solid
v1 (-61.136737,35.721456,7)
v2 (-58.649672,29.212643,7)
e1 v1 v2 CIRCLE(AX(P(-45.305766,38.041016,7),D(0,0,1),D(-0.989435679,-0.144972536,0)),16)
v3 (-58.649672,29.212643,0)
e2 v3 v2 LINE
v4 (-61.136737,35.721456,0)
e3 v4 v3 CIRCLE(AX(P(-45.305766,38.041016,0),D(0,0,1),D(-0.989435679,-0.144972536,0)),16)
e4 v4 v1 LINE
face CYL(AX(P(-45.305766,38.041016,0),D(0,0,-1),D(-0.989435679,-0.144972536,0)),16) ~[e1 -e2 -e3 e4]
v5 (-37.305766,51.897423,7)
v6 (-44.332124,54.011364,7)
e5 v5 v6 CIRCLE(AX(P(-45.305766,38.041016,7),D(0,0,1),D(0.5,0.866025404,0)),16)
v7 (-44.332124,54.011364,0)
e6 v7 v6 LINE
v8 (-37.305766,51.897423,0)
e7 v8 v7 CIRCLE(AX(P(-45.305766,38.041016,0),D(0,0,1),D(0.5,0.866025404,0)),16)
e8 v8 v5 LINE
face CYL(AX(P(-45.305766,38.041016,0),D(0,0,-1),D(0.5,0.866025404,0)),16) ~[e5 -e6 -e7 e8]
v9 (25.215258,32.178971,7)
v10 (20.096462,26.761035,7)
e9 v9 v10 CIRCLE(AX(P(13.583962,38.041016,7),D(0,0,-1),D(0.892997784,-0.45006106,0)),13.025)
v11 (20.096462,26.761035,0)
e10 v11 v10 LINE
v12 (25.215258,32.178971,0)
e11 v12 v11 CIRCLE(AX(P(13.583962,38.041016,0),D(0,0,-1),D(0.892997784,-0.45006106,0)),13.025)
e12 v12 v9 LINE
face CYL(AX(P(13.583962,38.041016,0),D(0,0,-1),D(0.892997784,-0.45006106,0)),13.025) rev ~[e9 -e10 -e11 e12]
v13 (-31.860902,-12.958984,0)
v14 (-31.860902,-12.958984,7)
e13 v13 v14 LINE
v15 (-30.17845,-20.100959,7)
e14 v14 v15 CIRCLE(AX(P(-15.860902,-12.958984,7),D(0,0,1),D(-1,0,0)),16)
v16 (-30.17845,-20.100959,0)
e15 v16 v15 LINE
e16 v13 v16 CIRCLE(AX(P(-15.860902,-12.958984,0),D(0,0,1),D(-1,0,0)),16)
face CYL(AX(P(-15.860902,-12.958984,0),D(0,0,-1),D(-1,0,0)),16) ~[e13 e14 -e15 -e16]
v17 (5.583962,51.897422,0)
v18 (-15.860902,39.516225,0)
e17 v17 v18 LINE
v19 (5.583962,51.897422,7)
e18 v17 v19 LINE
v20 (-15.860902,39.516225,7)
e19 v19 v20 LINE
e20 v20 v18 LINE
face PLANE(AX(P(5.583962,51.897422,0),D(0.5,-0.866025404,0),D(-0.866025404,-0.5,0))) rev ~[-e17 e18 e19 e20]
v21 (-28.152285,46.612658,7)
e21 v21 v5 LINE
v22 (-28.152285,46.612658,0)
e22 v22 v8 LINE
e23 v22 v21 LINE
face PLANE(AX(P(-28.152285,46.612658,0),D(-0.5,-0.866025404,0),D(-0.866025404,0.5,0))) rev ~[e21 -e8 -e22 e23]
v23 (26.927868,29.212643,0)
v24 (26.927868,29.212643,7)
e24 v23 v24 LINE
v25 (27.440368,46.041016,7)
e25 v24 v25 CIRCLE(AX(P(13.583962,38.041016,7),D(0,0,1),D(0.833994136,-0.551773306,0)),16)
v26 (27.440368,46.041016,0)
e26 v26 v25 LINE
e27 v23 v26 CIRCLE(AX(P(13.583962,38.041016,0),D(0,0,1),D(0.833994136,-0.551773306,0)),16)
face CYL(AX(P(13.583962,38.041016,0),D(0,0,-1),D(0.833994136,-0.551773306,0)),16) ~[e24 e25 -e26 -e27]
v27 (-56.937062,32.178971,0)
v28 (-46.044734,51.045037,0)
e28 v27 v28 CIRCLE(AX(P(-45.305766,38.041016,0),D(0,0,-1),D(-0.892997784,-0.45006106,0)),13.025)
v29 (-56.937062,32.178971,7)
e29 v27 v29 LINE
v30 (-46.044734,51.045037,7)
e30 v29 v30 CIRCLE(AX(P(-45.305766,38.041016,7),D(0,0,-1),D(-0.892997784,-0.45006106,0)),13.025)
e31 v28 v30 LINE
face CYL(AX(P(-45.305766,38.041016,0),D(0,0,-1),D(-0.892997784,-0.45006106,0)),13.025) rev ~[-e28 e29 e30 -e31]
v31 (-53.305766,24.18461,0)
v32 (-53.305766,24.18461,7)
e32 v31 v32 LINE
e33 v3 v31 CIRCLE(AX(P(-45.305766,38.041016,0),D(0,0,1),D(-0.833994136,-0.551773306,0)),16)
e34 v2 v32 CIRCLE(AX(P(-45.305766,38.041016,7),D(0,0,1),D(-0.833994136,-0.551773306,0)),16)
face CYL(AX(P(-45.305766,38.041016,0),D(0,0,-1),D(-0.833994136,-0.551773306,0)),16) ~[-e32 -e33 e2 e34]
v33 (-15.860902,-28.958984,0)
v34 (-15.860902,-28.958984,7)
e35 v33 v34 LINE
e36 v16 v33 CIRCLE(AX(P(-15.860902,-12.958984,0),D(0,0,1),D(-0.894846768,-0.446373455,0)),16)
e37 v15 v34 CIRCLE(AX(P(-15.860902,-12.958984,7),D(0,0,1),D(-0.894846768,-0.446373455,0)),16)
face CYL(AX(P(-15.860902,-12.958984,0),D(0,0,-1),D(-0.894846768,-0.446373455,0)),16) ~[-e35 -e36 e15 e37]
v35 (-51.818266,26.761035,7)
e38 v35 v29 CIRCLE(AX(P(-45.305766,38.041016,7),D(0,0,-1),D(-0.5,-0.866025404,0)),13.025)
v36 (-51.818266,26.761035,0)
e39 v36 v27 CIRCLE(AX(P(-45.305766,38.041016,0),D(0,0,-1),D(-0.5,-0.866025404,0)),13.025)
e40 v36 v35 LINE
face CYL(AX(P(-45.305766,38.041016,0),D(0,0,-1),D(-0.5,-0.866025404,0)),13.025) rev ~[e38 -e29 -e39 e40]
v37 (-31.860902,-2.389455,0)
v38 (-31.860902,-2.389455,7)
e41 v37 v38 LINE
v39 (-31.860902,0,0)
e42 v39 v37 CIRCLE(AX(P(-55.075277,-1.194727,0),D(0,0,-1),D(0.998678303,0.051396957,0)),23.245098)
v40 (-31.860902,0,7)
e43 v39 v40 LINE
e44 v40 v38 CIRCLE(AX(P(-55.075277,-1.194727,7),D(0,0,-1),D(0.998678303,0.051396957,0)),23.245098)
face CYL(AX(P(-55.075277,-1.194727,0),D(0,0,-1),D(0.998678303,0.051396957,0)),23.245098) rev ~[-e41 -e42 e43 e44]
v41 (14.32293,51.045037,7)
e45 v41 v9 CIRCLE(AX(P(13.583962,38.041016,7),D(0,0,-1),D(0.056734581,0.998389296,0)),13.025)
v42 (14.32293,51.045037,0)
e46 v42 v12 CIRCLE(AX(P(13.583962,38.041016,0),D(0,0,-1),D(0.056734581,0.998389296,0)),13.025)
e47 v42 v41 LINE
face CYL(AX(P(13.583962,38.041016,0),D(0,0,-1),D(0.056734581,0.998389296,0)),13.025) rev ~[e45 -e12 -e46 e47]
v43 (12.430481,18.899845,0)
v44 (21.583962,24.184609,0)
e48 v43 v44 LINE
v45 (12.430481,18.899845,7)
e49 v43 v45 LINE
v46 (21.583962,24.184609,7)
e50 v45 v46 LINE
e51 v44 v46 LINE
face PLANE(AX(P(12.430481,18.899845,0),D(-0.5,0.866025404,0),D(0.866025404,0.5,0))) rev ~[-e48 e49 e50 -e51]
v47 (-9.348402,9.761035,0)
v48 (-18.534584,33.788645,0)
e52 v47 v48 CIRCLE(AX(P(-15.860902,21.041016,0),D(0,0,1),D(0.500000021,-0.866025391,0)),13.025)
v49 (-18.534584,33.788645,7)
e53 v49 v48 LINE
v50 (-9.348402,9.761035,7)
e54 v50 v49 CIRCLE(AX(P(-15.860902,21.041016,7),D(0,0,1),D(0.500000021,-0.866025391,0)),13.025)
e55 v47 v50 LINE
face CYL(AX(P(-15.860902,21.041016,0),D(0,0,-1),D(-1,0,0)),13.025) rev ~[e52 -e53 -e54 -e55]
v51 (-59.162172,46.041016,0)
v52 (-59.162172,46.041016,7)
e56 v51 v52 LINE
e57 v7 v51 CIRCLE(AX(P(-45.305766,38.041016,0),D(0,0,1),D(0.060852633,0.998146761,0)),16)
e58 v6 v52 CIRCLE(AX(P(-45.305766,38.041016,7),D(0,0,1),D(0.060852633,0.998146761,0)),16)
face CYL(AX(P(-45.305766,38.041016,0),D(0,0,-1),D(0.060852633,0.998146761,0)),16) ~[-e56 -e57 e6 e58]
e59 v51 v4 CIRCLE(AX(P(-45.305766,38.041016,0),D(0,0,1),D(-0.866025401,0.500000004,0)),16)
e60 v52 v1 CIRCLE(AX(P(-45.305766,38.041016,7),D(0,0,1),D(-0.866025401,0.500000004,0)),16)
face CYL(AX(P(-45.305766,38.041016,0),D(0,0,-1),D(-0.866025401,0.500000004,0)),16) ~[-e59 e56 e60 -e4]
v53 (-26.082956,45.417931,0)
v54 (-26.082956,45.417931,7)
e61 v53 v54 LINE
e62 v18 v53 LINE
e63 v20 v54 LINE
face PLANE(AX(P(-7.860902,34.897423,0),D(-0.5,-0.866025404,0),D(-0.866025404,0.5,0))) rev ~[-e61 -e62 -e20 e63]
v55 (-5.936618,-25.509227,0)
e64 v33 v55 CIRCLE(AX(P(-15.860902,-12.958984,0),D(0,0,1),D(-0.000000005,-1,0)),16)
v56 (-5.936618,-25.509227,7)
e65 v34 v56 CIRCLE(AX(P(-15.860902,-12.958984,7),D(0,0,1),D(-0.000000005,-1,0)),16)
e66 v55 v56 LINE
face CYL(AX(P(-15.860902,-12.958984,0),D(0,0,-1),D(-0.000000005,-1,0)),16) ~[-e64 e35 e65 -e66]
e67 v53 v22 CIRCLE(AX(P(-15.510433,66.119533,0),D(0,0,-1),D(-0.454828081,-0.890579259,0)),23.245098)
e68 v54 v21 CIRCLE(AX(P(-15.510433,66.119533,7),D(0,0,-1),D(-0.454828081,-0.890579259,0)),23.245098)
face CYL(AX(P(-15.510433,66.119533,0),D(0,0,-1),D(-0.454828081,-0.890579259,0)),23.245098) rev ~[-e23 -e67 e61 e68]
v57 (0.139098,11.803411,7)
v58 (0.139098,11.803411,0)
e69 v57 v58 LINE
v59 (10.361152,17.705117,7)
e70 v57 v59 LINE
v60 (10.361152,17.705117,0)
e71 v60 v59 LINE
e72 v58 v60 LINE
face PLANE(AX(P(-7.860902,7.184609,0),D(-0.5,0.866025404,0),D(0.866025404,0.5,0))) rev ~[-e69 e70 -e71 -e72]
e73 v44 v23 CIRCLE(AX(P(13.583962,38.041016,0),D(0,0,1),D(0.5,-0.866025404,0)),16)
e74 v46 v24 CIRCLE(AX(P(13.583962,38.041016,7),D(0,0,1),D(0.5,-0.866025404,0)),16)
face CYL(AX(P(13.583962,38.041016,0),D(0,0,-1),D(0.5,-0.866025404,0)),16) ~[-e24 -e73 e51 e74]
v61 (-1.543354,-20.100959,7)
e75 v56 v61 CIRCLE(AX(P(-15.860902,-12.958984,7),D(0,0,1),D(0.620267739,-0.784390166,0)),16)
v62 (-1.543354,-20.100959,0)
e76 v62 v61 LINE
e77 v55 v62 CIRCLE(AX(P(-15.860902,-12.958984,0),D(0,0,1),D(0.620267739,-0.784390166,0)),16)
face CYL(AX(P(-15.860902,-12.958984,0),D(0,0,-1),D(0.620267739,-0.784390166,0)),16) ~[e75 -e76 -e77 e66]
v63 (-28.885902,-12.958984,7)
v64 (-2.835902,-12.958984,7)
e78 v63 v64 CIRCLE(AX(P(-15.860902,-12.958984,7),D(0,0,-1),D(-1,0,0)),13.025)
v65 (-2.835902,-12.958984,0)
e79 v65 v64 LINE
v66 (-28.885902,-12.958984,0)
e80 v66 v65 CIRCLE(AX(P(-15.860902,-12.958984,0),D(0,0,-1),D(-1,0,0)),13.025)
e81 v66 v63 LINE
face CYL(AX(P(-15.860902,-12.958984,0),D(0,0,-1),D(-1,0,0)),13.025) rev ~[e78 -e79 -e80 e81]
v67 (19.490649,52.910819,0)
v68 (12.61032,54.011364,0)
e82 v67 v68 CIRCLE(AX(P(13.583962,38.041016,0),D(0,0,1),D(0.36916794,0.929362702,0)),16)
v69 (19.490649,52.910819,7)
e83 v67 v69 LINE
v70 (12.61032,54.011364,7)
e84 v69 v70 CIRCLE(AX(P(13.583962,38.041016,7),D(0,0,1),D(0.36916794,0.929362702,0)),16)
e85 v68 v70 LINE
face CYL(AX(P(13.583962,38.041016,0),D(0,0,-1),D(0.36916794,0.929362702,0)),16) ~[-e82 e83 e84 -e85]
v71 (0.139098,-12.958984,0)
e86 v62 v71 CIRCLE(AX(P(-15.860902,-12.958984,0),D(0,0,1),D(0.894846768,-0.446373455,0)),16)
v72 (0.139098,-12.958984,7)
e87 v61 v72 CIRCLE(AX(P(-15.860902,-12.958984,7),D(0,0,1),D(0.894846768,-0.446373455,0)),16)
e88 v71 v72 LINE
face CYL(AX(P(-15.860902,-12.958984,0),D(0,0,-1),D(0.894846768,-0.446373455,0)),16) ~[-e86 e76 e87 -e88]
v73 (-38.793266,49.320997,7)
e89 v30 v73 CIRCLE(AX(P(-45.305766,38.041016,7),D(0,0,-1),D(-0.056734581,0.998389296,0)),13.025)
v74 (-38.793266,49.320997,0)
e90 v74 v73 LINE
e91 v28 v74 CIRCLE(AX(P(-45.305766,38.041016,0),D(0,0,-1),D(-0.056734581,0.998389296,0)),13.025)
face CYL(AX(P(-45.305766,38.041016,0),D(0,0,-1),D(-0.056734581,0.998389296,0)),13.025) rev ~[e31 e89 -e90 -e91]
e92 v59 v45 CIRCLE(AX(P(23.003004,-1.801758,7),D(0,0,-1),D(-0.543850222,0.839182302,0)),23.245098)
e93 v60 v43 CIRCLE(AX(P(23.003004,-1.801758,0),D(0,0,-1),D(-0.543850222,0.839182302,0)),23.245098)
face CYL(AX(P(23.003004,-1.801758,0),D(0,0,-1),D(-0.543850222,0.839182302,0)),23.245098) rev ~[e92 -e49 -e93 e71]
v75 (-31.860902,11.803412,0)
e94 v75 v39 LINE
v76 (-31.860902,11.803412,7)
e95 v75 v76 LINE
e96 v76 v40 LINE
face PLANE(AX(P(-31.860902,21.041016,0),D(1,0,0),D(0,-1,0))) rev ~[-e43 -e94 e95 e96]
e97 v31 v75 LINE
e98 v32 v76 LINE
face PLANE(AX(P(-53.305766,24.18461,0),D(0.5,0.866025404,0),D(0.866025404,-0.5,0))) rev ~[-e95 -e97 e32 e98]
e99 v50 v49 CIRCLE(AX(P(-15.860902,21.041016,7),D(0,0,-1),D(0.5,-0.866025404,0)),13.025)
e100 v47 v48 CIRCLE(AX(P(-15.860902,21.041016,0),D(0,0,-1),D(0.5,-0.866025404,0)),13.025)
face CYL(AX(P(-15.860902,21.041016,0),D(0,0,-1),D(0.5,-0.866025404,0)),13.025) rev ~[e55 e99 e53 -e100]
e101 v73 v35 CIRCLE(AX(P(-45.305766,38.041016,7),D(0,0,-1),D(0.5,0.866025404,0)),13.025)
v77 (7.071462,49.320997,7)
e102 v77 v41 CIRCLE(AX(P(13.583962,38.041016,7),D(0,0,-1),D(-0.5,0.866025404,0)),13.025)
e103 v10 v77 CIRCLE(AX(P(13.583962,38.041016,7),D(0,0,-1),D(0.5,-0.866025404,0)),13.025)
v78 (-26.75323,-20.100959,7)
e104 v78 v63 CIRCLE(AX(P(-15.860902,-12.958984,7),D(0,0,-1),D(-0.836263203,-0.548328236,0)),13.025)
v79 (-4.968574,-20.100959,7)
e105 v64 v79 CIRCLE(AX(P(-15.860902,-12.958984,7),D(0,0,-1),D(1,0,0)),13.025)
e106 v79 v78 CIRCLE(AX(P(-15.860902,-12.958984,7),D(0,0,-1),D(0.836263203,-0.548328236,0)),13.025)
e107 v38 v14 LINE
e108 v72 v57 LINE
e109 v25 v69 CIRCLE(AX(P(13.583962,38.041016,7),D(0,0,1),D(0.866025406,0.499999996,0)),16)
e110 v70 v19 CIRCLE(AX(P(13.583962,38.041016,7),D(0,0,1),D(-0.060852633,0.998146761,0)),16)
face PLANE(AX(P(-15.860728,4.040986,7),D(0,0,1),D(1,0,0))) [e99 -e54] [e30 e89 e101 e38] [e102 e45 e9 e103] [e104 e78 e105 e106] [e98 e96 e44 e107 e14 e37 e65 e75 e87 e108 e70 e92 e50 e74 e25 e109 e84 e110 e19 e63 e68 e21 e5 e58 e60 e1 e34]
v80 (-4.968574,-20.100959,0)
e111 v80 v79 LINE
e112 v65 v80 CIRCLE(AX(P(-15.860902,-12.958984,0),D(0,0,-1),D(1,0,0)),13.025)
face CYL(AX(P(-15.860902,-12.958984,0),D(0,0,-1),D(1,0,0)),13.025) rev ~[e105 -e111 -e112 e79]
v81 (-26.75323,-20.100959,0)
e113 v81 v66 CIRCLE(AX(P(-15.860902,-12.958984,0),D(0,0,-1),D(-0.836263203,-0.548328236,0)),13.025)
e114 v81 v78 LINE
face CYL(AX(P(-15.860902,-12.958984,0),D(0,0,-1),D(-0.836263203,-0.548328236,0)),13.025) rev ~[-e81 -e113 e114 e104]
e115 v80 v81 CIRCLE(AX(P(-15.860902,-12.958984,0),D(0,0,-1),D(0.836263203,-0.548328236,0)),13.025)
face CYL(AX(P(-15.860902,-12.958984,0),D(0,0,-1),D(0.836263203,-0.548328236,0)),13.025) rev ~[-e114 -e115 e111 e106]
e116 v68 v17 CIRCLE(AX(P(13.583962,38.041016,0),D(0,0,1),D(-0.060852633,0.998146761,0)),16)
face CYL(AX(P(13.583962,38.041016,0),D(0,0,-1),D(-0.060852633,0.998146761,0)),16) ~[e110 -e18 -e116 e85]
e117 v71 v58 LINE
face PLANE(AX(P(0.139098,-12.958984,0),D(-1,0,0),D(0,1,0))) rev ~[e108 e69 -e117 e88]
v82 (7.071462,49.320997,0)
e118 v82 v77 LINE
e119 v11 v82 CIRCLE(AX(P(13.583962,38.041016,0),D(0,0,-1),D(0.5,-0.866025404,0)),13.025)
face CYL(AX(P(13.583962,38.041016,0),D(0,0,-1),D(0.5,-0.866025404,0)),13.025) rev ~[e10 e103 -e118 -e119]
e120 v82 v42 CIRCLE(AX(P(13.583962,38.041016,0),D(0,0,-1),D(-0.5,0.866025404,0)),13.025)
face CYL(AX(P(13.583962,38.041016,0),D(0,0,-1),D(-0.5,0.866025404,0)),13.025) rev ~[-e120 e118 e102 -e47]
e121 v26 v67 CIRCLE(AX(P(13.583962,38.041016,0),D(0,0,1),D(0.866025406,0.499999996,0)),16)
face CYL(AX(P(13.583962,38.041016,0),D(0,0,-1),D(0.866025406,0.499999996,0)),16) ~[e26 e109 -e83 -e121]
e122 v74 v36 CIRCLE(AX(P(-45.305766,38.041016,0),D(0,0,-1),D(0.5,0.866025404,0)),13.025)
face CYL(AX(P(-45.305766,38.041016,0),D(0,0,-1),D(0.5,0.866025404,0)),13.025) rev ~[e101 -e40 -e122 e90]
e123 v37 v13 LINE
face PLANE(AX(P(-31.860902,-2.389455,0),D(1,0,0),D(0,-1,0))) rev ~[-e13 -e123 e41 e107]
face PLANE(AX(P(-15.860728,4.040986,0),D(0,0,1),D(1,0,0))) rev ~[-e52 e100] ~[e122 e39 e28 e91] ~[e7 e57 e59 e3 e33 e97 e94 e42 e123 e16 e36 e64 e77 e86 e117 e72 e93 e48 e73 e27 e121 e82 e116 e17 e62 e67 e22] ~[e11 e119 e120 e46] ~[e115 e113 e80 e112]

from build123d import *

# Parameters (mm, degrees)
F1_DEPTH        = 7
F1_COPIES_COUNT = 3


# Not quite as in the source:
# - a feature of the source that left no trace in its solid (it failed there, or was rolled back) is left out
# - a pattern or mirror of a feature is missing from the dataset's text; its kind, count and spacing are read off the source's solid


with BuildPart() as f1:
    # F0 (on Top) → F1 (new body)
    with BuildSketch(Plane.XY):
        with BuildLine():
            Line((0.1390978545, -12.9589841303), (0.1390978545, 21.0410158697))
            ThreePointArc((0.1390978545, 21.0410158697), (-15.8609021455, 5.0410158697), (-31.8609021455, 21.0410158697))
            Line((-31.8609021455, 21.0410158697), (-31.8609021455, 0))
            ThreePointArc((-31.8609021455, 0), (-31.8301791681, -1.1947273097), (-31.8609021455, -2.3894546193))
            Line((-31.8609021455, -2.3894546193), (-31.8609021455, -12.9589841303))
            ThreePointArc((-31.8609021455, -12.9589841303), (-15.8609021455, 3.0410158697), (0.1390978545, -12.9589841303))
        make_face()
        with BuildLine():
            Line((0.1390978545, 21.0410158697), (-2.8359021455, 21.0410158697))
            ThreePointArc((-2.8359021455, 21.0410158697), (-15.8609021455, 8.0160158697), (-28.8859021455, 21.0410158697))
            Line((-28.8859021455, 21.0410158697), (-31.8609021455, 21.0410158697))
            ThreePointArc((-31.8609021455, 21.0410158697), (-15.8609021455, 5.0410158697), (0.1390978545, 21.0410158697))
        make_face()
        with BuildLine():
            ThreePointArc((-28.8859021455, 21.0410158697), (-15.8609021455, 34.0660158697), (-2.8359021455, 21.0410158697))
            Line((-2.8359021455, 21.0410158697), (0.1390978545, 21.0410158697))
            ThreePointArc((0.1390978545, 21.0410158697), (-15.8609021455, 37.0410158697), (-31.8609021455, 21.0410158697))
            Line((-31.8609021455, 21.0410158697), (-28.8859021455, 21.0410158697))
        make_face()
        with BuildLine():
            Line((-2.8359021455, -12.9589841303), (0.1390978545, -12.9589841303))
            ThreePointArc((0.1390978545, -12.9589841303), (-15.8609021455, 3.0410158697), (-31.8609021455, -12.9589841303))
            Line((-31.8609021455, -12.9589841303), (-28.8859021455, -12.9589841303))
            ThreePointArc((-28.8859021455, -12.9589841303), (-15.8609021455, 0.0660158697), (-2.8359021455, -12.9589841303))
        make_face()
        with BuildLine():
            Line((-28.8859021455, -12.9589841303), (-31.8609021455, -12.9589841303))
            ThreePointArc((-31.8609021455, -12.9589841303), (-31.4346103213, -16.6277187425), (-30.1784504386, -20.1009594084))
            Line((-30.1784504386, -20.1009594084), (-26.7532303689, -20.1009594084))
            ThreePointArc((-26.7532303689, -20.1009594084), (-28.3413508576, -16.6857823466), (-28.8859021455, -12.9589841303))
        make_face()
        with BuildLine():
            ThreePointArc((-1.5433538524, -20.1009594084), (-0.2871939697, -16.6277187425), (0.1390978545, -12.9589841303))
            Line((0.1390978545, -12.9589841303), (-2.8359021455, -12.9589841303))
            ThreePointArc((-2.8359021455, -12.9589841303), (-3.3804534334, -16.6857823466), (-4.9685739221, -20.1009594084))
            Line((-4.9685739221, -20.1009594084), (-1.5433538524, -20.1009594084))
        make_face()
        with BuildLine():
            ThreePointArc((-5.9366183214, -25.5092267804), (-3.4420074647, -23.0471482302), (-1.5433538524, -20.1009594084))
            Line((-1.5433538524, -20.1009594084), (-4.9685739221, -20.1009594084))
            ThreePointArc((-4.9685739221, -20.1009594084), (-15.8609021455, -25.9839841303), (-26.7532303689, -20.1009594084))
            Line((-26.7532303689, -20.1009594084), (-30.1784504386, -20.1009594084))
            ThreePointArc((-30.1784504386, -20.1009594084), (-24.2789897171, -26.5654458906), (-15.8609022277, -28.9589841303))
            ThreePointArc((-15.8609022277, -28.9589841303), (-10.6075167236, -28.0719567567), (-5.9366183214, -25.5092267804))
        make_face()
    extrude(amount=F1_DEPTH)

    # F1_copies: F1 ×3 about axis
    f1_copies_axis = Axis((-15.860902, 21.041016, 0), (0, 0, 1))


with BuildPart() as f1_1:
    add(f1.part)
    for i in range(1, F1_COPIES_COUNT):
        add(f1.part.rotate(f1_copies_axis, i * 360 / F1_COPIES_COUNT))


solid = f1_1.part
